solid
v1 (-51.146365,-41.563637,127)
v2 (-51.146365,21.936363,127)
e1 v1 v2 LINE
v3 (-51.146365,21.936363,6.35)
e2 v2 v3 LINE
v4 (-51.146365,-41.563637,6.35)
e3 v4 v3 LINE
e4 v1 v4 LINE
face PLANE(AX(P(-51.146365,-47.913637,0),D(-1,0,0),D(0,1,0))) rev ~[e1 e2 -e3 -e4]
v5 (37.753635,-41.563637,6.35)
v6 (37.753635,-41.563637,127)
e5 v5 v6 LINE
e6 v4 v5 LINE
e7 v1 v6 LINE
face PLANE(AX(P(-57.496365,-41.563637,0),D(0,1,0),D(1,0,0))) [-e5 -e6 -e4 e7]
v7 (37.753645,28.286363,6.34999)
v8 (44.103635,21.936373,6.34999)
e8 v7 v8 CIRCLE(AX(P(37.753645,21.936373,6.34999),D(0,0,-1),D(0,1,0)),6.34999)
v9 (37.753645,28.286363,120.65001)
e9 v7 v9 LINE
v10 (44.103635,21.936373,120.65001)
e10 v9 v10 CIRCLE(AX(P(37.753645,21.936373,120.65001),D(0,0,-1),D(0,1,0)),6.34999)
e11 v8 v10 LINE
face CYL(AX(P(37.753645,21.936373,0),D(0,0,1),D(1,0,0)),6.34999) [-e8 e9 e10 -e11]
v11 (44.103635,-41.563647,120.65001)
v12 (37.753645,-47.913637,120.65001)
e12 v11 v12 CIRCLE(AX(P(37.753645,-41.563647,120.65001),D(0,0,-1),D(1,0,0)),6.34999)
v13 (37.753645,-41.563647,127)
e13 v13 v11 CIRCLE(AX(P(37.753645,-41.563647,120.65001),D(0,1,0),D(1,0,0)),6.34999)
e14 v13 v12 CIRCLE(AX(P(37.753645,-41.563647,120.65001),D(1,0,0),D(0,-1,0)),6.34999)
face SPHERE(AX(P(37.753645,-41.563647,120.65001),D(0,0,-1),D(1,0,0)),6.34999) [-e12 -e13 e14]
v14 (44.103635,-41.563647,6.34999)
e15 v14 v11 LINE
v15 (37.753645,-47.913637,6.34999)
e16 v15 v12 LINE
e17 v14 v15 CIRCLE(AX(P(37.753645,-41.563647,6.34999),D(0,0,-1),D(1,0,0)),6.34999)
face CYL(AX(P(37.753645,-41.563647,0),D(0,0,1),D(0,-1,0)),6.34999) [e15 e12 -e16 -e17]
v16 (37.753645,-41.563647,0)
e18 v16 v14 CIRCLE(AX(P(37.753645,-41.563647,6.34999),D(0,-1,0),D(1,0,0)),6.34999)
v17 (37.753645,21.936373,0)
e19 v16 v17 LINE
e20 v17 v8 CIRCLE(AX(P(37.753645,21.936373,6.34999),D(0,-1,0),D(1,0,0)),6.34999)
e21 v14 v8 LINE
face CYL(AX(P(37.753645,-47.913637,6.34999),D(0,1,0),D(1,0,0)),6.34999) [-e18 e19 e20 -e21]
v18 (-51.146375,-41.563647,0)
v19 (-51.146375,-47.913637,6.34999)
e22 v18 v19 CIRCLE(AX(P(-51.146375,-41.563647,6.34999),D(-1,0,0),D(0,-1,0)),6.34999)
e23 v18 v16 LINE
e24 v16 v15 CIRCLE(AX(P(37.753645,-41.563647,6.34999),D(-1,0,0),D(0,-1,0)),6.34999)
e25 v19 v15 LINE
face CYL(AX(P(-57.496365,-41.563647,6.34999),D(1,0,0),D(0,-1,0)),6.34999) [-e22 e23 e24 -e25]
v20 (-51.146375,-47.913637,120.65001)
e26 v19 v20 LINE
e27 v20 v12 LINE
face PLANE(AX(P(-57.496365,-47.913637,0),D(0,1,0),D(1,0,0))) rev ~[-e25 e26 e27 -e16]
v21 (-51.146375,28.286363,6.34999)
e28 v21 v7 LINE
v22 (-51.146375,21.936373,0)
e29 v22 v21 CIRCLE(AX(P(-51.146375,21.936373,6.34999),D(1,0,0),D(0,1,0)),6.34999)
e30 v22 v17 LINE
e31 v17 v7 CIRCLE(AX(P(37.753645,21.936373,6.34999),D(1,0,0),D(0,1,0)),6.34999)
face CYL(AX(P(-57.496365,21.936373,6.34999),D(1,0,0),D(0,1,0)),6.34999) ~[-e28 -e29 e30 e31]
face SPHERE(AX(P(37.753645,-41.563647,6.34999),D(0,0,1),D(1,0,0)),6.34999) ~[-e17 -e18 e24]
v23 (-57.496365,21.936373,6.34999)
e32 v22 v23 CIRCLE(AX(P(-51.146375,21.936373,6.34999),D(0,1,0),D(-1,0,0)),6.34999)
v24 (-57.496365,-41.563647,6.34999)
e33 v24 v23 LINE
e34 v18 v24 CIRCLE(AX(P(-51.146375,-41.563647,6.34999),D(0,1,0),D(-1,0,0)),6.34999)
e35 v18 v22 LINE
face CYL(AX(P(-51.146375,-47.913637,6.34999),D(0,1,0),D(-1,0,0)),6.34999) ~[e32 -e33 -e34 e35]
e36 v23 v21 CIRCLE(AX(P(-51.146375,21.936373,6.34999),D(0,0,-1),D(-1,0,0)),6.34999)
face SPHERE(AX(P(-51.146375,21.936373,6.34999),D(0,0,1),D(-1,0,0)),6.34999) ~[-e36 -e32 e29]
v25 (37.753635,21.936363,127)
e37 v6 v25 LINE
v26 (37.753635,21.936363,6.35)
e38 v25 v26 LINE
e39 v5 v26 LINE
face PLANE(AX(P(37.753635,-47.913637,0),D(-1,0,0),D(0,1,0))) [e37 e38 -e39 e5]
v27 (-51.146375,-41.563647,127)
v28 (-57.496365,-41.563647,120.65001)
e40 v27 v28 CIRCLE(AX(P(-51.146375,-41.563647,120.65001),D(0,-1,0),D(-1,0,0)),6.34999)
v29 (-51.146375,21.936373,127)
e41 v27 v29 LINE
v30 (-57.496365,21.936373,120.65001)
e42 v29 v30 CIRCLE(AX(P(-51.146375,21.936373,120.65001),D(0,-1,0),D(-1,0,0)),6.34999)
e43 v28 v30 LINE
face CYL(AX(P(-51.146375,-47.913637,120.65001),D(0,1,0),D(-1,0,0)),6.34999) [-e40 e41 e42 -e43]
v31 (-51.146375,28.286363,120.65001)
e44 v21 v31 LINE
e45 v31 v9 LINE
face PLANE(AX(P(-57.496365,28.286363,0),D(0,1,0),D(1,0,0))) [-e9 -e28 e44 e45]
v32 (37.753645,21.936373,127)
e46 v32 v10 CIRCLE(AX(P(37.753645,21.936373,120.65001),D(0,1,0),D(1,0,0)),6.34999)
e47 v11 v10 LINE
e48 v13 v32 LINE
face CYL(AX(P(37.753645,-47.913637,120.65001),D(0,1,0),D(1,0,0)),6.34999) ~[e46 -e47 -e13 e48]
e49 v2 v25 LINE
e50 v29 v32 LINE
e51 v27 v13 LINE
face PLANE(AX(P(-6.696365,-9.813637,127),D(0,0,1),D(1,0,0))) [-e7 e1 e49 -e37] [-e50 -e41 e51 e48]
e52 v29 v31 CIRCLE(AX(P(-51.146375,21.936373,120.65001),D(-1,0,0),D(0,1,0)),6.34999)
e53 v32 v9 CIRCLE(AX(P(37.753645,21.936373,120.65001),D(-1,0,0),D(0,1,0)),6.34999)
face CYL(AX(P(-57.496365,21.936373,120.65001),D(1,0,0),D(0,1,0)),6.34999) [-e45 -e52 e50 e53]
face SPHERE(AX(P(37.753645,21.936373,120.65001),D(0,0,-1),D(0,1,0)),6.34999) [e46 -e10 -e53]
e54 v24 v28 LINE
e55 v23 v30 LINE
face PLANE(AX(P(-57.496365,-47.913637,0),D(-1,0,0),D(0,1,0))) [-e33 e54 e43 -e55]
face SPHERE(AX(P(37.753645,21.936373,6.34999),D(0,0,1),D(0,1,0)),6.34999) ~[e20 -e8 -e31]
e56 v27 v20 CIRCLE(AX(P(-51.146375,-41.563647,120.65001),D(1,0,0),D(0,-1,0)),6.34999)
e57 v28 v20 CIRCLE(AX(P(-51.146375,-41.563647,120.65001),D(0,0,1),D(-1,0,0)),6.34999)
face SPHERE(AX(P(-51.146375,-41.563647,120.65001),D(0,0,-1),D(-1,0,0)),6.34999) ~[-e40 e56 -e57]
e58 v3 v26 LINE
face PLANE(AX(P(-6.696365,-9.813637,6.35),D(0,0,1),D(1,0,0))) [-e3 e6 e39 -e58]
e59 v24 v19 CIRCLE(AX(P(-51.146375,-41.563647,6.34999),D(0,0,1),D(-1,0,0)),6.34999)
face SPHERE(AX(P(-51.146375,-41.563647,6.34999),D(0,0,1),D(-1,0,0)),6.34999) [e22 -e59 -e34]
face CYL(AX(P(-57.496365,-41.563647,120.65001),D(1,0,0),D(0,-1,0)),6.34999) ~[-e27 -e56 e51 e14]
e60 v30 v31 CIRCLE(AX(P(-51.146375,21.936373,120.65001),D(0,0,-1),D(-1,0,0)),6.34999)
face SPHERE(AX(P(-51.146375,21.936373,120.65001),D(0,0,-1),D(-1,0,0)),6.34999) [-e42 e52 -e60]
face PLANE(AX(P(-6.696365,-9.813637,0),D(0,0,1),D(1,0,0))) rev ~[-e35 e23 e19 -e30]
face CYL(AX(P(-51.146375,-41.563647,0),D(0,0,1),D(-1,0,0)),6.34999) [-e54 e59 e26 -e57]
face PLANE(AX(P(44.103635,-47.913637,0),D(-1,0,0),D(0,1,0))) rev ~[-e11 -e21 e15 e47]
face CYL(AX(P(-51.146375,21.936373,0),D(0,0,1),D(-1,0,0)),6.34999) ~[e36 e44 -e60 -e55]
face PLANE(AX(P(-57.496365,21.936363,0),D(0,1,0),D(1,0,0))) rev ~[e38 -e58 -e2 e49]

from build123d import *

# Parameters (mm, degrees)
F0_W     = 101.6
F0_H     = 76.2
F1_DEPTH = 127
F2_T     = -6.35
F3_R     = 6.34999


# Not quite as in the source:
# - a fillet or chamfer is up to 0.001 mm smaller than in the source, because OpenCascade refuses the exact size


with BuildPart() as f1:
    # F0 (on Top) → F1 (new body)
    with BuildSketch(Plane.XY):
        with Locations((-6.6963651597, -9.8136370122)):
            Rectangle(F0_W, F0_H)
    extrude(amount=F1_DEPTH)

    # F2
    f2_openings = [f1.faces().sort_by_distance(p)[0] for p in [
        (-6.696365, -9.813637, 127),
    ]]
    offset(amount=F2_T, openings=f2_openings)

    # F3 (radius 6.35 in the source; OpenCascade refuses exactly that, so slightly less here)
    f3_edges = [f1.edges().sort_by_distance(p)[0] for p in [
        (-57.496365, -47.913637, 63.5),
        (-57.496365, 28.286363, 63.5),
        (-57.496365, -9.813637, 0),
        (-57.496365, -9.813637, 127),
        (44.103635, 28.286363, 63.5),
        (-6.696365, 28.286363, 0),
        (-6.696365, 28.286363, 127),
        (44.103635, -47.913637, 63.5),
        (44.103635, -9.813637, 0),
        (44.103635, -9.813637, 127),
        (-6.696365, -47.913637, 0),
        (-6.696365, -47.913637, 127),
    ]]
    fillet(f3_edges, radius=F3_R)


solid = f1.part
